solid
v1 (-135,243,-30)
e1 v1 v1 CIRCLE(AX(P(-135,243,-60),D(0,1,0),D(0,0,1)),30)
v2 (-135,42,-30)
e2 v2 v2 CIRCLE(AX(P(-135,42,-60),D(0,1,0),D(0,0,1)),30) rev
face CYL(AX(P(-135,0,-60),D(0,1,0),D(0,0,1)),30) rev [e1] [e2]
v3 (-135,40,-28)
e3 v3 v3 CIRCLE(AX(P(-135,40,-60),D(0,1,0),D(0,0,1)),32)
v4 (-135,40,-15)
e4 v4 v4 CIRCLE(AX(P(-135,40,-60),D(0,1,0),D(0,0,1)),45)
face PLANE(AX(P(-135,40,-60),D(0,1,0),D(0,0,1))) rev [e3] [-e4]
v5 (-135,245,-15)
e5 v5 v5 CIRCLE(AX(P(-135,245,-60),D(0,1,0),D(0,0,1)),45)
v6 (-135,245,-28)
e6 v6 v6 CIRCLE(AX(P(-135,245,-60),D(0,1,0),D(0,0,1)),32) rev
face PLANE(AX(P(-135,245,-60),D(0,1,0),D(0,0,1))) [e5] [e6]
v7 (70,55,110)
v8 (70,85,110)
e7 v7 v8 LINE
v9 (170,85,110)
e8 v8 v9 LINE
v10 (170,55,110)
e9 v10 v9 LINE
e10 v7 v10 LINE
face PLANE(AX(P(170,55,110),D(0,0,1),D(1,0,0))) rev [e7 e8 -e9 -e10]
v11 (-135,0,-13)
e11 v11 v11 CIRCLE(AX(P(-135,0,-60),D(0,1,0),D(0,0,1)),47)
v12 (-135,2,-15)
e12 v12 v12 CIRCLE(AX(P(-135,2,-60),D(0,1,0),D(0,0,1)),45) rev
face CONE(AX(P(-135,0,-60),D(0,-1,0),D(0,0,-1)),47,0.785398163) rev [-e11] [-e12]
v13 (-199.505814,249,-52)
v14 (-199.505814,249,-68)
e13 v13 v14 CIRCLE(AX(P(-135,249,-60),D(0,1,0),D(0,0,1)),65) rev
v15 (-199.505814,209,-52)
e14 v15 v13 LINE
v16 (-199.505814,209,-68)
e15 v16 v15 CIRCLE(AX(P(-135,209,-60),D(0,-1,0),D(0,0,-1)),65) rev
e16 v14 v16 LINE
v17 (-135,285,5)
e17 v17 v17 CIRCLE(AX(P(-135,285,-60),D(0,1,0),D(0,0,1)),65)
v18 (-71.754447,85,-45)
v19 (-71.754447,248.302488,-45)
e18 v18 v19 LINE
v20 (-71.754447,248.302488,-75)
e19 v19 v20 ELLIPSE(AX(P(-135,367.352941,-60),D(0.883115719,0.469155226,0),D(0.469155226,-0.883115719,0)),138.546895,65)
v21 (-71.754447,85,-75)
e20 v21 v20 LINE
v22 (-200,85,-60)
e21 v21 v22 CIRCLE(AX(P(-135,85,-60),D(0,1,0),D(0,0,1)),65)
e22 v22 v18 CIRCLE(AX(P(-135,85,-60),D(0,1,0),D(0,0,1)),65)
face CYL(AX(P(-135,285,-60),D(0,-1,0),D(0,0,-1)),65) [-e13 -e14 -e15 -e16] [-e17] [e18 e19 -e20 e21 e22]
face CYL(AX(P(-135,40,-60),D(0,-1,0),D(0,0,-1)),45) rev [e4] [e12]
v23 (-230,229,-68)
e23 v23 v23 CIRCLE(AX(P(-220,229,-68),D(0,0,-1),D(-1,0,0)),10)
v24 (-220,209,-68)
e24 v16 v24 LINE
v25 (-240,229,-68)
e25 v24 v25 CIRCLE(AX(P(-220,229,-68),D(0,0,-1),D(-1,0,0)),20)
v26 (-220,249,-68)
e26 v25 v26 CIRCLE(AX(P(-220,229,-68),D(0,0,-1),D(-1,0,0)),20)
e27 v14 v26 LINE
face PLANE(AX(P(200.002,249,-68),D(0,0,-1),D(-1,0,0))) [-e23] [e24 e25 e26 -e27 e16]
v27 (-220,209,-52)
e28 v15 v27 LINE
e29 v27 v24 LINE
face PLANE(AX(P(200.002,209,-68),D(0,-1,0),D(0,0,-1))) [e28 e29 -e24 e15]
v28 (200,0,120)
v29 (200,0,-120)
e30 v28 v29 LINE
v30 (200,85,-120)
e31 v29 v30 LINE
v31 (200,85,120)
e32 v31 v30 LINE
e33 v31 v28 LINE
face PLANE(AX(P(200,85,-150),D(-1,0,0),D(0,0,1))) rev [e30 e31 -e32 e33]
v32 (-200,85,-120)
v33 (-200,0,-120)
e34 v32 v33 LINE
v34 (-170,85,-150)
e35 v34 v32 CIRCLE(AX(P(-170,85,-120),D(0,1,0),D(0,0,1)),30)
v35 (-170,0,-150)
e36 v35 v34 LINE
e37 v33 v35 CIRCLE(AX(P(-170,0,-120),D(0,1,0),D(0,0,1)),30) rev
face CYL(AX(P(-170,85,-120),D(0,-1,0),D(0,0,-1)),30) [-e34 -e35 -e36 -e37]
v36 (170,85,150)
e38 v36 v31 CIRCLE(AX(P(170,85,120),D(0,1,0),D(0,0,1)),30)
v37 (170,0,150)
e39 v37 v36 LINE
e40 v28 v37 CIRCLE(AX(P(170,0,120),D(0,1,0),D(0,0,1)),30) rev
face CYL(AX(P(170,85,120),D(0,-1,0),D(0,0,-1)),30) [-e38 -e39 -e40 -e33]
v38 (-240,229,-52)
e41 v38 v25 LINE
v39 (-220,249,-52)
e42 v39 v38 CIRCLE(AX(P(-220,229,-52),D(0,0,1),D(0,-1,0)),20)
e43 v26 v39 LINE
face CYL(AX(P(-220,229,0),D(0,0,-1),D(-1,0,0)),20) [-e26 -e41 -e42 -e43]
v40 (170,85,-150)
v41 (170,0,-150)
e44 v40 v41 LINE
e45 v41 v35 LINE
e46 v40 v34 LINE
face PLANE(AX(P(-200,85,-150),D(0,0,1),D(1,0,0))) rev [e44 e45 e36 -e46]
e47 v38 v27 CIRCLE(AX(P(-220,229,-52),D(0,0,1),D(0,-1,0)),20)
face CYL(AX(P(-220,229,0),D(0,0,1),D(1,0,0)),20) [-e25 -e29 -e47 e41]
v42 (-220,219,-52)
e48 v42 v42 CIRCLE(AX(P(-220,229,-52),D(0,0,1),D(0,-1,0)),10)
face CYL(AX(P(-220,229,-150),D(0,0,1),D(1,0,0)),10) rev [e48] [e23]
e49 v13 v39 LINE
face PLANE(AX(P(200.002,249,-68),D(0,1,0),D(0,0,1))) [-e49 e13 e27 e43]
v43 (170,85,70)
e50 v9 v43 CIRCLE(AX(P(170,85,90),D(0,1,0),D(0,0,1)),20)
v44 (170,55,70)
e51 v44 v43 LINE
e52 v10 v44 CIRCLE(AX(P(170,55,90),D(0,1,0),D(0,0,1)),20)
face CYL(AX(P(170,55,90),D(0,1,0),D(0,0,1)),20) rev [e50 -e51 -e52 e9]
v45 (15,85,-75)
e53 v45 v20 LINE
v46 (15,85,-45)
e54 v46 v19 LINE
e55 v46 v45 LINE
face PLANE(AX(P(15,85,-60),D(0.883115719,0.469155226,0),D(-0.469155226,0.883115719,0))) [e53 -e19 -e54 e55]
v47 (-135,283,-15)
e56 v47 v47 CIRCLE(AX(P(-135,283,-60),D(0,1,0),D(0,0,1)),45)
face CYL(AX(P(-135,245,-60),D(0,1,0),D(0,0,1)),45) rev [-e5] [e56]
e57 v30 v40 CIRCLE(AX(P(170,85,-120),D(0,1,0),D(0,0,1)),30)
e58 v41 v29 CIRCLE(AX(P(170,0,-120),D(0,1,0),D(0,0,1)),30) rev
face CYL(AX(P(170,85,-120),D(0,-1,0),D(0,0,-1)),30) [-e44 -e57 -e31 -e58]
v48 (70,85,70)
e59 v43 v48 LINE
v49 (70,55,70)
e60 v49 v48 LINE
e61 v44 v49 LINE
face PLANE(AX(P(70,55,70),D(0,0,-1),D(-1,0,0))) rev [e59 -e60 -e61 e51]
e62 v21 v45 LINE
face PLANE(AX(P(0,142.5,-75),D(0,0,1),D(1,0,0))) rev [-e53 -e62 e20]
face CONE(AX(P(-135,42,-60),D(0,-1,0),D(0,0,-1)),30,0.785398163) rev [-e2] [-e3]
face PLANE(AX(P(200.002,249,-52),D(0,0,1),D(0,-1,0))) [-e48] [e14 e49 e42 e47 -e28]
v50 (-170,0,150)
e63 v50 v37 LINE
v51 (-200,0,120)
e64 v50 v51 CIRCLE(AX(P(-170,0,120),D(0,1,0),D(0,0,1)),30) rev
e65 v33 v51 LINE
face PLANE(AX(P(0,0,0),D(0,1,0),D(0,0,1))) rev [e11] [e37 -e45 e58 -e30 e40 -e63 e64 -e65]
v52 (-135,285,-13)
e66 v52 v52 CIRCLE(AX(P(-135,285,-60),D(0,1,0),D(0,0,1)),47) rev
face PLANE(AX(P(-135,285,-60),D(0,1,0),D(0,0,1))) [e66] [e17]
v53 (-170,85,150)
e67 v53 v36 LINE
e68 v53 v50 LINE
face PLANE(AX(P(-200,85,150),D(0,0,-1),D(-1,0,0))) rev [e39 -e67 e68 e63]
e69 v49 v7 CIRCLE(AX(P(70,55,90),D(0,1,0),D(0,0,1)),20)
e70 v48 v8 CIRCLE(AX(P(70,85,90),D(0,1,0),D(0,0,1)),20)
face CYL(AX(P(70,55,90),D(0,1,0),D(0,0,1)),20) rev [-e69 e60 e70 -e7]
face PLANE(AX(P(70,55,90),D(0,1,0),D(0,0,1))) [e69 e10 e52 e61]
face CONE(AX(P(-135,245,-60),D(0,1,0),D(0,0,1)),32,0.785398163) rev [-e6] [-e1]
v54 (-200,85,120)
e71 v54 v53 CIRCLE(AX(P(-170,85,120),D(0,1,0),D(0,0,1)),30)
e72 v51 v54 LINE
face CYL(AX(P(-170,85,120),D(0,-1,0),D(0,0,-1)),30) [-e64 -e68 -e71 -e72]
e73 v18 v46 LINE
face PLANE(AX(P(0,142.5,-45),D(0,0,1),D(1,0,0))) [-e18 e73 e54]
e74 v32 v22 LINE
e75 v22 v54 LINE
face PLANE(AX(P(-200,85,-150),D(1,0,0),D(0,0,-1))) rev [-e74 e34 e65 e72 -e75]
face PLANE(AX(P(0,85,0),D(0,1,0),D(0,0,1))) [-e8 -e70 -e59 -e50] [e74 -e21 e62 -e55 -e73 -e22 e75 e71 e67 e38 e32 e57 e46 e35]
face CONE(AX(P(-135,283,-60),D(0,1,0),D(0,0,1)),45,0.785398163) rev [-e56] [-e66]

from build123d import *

# Parameters (mm, degrees)
SKETCH1_W                = 400
SKETCH1_H                = 300
BOSS_EXTRUDE1_DEPTH      = 85
SKETCH2_R                = 65
BOSS_EXTRUDE2_DEPTH      = 200
FILLET1_R                = 30
CUT_EXTRUDE1_DEPTH       = 30
RIB1_REACH               = 408.602
SKETCH4_WALL_W           = 996.380250876
SKETCH4_WALL_H           = 30
SKETCH6_R                = 30
CUT_EXTRUDE2_DEPTH       = 380.110801745
SKETCH7_R                = 45
CUT_EXTRUDE3_DEPTH       = 40
CUT_EXTRUDE4_START       = -40
SKETCH8_R                = 45
CUT_EXTRUDE4_DEPTH       = 40
CHAMFER1_SIZE            = 2
BOSS_EXTRUDE3_REACH      = 547.275
BOSS_EXTRUDE3_END_RADIUS = 65
SKETCH9_W                = 16
SKETCH9_H                = 40
FILLET2_R                = 20
CUT_EXTRUDE5_DEPTH       = 424.826615493
CUT_EXTRUDE5_DEPTH_BACK  = 424.826615493
SKETCH10_R               = 10


with BuildPart() as part:
    # Sketch1 → Boss-Extrude1 (new body)
    with BuildSketch(Plane(origin=(0, 0, 0), x_dir=(1, 0, 0), z_dir=(0, 1, 0))):
        Rectangle(SKETCH1_W, SKETCH1_H)
    extrude(amount=BOSS_EXTRUDE1_DEPTH)

    # Sketch2 → Boss-Extrude2 (add)
    with BuildSketch(Plane(origin=(0, 85, 0), x_dir=(1, 0, 0), z_dir=(0, 1, 0))):
        with Locations(Location((-135, 60, 0), (0, 0, 180))):
            Circle(SKETCH2_R)
    extrude(amount=BOSS_EXTRUDE2_DEPTH)

    # Fillet1
    fillet1_edges = [part.edges().sort_by_distance(p)[0] for p in [
        (200, 42.5, 150),
        (-200, 42.5, 150),
        (-200, 42.5, -150),
        (200, 42.5, -150),
    ]]
    fillet(fillet1_edges, radius=FILLET1_R)

    # Sketch3 → Cut-Extrude1 (cut)
    with BuildSketch(Plane(origin=(0, 85, 0), x_dir=(1, 0, 0), z_dir=(0, 1, 0))):
        with BuildLine():
            Line((70, -70), (170, -70))
            ThreePointArc((170, -70), (190, -90), (170, -110))
            Line((170, -110), (70, -110))
            ThreePointArc((70, -110), (50, -90), (70, -70))
        make_face()
    extrude(amount=-CUT_EXTRUDE1_DEPTH, mode=Mode.SUBTRACT)

    # Sketch4 wall → Rib1 (add, up to next)
    with BuildSketch(Plane(origin=(-27.5, 165, -60), x_dir=(-0.469155225962, 0.883115719457, 0), z_dir=(-0.883115719457, -0.469155225962, 0)), mode=Mode.PRIVATE) as rib1_sk1:
        Rectangle(SKETCH4_WALL_W, SKETCH4_WALL_H)
    rib1_tool1 = extrude(rib1_sk1.sketch, amount=RIB1_REACH, mode=Mode.PRIVATE) - part.part
    add(rib1_tool1.solids().sort_by_distance((-27.5, 165, -60))[0])

    # Sketch6 → Cut-Extrude2 (cut, through all)
    with BuildSketch(Plane(origin=(0, 285, 0), x_dir=(1, 0, 0), z_dir=(0, 1, 0))):
        with Locations(Location((-135, 60, 0), (0, 0, 270))):
            Circle(SKETCH6_R)
    extrude(amount=-CUT_EXTRUDE2_DEPTH, mode=Mode.SUBTRACT)

    # Sketch7 → Cut-Extrude3 (cut)
    with BuildSketch(Plane(origin=(0, 0, 0), x_dir=(1, 0, 0), z_dir=(0, 1, 0))):
        with Locations(Location((-135, 60, 0), (0, 0, 270))):
            Circle(SKETCH7_R)
    extrude(amount=CUT_EXTRUDE3_DEPTH, mode=Mode.SUBTRACT)

    # Sketch8 → Cut-Extrude4 (cut)
    with BuildSketch(Plane(origin=(0, 285, 0), x_dir=(1, 0, 0), z_dir=(0, 1, 0)).offset(CUT_EXTRUDE4_START)):
        with Locations(Location((-135, 60, 0), (0, 0, 270))):
            Circle(SKETCH8_R)
    extrude(amount=CUT_EXTRUDE4_DEPTH, mode=Mode.SUBTRACT)

    # Chamfer1
    chamfer1_edges = [part.edges().sort_by_distance(p)[0] for p in [
        (-135, 285, -105),
        (-135, 245, -90),
        (-135, 40, -90),
        (-135, 0, -105),
    ]]
    chamfer(chamfer1_edges, length=CHAMFER1_SIZE)

    # Boss-Extrude3: up to this cylinder (the profile starts outside it)
    boss_extrude3_end = Plane(origin=(-135, 229, -60), z_dir=(0, -1, 0)) * Cylinder(BOSS_EXTRUDE3_END_RADIUS, 1225.55, mode=Mode.PRIVATE)
    # Sketch9 → Boss-Extrude3 (add, up to the surface)
    with BuildSketch(Plane.ZY.offset(240), mode=Mode.PRIVATE) as boss_extrude3_sk1:
        with Locations((-60, 229)):
            Rectangle(SKETCH9_W, SKETCH9_H)
    boss_extrude3_tool1 = extrude(boss_extrude3_sk1.sketch, amount=-BOSS_EXTRUDE3_REACH, mode=Mode.PRIVATE) - boss_extrude3_end
    add(boss_extrude3_tool1.solids().sort_by_distance((-240, 229, -60))[0])

    # Fillet2
    fillet2_edges = [part.edges().sort_by_distance(p)[0] for p in [
        (-240, 209, -60),
        (-240, 249, -60),
    ]]
    fillet(fillet2_edges, radius=FILLET2_R - 0.0001)  # a hair under: the kernel refuses the full size

    # Sketch10 → Cut-Extrude5 (cut, two sides: drawn at the far end of the back side and taken through both)
    with BuildSketch(Plane.XY.offset(-52).offset(-CUT_EXTRUDE5_DEPTH_BACK)):
        with Locations(Location((-220, 229, 0), (0, 0, 270))):
            Circle(SKETCH10_R)
    extrude(amount=CUT_EXTRUDE5_DEPTH + CUT_EXTRUDE5_DEPTH_BACK, mode=Mode.SUBTRACT)


solid = part.part
